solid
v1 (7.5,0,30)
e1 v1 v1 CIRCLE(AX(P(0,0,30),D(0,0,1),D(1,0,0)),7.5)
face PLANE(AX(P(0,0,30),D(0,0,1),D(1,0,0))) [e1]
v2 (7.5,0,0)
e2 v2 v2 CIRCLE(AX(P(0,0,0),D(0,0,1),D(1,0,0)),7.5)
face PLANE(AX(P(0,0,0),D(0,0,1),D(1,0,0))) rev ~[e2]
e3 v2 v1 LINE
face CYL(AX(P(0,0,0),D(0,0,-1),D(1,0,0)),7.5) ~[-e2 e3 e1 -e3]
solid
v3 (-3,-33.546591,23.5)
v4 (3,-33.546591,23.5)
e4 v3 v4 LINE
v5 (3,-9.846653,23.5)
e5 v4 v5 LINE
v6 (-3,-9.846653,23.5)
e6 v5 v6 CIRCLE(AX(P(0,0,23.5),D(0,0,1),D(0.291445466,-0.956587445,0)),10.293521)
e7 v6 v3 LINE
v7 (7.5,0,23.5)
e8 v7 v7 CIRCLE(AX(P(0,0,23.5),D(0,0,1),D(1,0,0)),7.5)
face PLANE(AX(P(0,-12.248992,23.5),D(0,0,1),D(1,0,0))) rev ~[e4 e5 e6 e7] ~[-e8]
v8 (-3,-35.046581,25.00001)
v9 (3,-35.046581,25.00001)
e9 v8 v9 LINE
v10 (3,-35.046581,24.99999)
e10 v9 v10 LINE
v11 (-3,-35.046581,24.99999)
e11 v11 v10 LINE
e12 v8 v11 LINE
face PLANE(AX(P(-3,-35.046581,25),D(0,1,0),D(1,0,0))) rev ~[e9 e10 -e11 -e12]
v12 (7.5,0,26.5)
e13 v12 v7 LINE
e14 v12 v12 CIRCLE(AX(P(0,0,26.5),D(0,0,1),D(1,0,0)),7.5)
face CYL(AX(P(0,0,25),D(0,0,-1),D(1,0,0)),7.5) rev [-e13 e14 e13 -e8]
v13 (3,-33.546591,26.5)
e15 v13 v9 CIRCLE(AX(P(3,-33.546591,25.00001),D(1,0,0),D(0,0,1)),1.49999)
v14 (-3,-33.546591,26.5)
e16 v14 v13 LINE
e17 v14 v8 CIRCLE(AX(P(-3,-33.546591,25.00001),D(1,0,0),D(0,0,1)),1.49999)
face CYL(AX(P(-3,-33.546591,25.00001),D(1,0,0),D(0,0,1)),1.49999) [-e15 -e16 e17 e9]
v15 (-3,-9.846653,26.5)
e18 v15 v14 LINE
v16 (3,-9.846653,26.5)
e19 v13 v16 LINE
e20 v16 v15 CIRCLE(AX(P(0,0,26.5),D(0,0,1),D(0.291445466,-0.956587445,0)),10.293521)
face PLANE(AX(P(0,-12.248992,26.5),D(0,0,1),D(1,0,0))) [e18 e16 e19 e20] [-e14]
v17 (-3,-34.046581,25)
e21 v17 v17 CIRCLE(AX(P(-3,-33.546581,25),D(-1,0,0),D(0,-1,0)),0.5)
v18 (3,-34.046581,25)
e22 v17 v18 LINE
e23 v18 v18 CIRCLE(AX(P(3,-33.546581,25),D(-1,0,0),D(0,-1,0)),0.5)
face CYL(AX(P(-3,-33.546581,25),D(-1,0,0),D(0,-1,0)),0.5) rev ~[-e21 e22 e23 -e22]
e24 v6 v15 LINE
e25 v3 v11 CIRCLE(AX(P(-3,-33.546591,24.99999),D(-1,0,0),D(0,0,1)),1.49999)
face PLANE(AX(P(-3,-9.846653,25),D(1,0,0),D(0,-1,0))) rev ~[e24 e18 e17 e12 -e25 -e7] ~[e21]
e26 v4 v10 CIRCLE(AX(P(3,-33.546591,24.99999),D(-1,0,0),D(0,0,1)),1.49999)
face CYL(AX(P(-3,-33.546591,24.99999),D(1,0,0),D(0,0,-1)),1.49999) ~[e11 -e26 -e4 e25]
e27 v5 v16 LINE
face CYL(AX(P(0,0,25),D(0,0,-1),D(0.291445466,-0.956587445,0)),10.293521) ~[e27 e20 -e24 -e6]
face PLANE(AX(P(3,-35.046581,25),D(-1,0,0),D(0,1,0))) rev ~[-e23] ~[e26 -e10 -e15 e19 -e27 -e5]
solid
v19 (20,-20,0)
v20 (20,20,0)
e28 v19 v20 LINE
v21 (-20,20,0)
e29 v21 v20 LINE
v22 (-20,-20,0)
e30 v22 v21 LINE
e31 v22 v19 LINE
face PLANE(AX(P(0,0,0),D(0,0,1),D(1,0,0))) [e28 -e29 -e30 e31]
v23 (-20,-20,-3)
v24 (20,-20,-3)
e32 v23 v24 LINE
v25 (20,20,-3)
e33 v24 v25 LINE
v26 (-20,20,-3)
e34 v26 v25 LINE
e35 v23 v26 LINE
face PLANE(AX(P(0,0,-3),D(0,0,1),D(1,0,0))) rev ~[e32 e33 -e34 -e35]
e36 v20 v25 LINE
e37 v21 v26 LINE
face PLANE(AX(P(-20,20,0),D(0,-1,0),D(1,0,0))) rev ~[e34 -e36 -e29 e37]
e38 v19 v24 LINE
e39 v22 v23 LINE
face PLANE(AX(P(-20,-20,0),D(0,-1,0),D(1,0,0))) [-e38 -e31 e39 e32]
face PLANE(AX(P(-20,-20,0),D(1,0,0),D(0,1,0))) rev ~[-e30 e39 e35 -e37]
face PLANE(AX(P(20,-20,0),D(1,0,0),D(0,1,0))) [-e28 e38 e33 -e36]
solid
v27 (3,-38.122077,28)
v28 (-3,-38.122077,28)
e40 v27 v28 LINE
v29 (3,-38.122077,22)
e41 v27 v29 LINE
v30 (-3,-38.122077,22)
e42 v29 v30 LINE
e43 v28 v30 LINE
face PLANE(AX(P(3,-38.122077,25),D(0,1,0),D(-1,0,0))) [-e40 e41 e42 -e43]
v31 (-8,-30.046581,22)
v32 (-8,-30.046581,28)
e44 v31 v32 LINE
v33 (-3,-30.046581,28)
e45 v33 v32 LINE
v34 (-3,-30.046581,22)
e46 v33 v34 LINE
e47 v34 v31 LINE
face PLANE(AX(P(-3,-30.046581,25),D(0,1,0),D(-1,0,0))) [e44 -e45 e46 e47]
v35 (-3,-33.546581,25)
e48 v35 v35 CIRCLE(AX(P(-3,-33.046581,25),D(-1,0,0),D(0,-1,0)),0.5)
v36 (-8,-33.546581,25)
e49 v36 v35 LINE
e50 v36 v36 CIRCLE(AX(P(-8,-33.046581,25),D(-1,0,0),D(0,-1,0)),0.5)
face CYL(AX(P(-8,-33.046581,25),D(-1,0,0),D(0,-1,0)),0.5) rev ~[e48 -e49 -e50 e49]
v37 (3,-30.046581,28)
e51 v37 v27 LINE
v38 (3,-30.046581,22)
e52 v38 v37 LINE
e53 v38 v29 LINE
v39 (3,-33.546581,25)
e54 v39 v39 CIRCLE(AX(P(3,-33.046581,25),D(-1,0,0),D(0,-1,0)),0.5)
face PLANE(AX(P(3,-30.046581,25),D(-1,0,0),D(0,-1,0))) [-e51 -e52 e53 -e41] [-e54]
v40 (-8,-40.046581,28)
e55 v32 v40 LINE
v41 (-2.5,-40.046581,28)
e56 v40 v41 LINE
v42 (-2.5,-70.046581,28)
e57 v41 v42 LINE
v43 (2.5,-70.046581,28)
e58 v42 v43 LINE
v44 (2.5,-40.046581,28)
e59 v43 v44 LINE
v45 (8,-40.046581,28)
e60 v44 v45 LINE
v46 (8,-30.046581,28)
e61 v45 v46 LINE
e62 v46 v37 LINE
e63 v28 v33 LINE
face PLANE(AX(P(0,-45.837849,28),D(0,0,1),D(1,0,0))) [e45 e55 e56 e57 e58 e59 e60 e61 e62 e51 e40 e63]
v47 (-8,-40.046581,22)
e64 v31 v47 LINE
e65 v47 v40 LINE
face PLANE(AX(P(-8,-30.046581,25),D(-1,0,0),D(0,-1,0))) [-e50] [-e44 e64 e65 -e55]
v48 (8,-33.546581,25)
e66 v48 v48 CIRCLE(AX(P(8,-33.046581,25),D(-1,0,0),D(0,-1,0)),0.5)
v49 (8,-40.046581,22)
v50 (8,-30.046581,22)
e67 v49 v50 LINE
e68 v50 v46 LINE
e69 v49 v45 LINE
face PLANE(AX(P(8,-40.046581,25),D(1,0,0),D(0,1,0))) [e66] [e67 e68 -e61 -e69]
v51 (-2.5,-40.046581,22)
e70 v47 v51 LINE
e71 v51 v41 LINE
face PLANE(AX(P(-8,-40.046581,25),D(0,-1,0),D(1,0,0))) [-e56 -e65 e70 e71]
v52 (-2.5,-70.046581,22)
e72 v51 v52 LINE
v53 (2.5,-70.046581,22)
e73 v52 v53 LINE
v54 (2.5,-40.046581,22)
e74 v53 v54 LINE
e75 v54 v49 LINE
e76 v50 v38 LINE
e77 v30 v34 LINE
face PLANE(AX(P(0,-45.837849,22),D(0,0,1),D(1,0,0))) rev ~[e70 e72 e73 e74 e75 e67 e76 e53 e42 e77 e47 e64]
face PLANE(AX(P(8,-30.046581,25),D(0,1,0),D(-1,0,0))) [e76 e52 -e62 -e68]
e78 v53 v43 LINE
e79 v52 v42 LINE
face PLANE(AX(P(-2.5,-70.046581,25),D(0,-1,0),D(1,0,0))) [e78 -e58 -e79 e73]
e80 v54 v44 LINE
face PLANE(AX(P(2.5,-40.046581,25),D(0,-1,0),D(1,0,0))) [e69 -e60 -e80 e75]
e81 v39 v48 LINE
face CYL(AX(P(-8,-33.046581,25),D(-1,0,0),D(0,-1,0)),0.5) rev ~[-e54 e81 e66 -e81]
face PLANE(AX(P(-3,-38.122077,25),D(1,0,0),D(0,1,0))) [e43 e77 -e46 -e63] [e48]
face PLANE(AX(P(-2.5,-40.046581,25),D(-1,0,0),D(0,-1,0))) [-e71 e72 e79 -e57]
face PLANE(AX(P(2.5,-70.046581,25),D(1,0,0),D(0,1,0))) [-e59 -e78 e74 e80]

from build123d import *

# Parameters (mm, degrees)
F0_W      = 40
F0_H      = 40
F1_DEPTH  = 3
F2_R      = 7.5
F3_DEPTH  = 30
F5_R      = 7.5
F6_DEPTH  = 1.5
F8_DEPTH  = 3
F9_R      = 1.49999
F10_R     = 0.5
F11_DEPTH = 23.001
F12_R     = 0.5
F13_DEPTH = 28.001


# Not quite as in the source:
# - a fillet or chamfer is up to 0.001 mm smaller than in the source, because OpenCascade refuses the exact size


with BuildPart() as f1:
    # F0 (on Top) → F1 (new body)
    with BuildSketch(Plane.XY):
        Rectangle(F0_W, F0_H)
    extrude(amount=-F1_DEPTH)


with BuildPart() as f3:
    # F2 (on face) → F3 (new body)
    with BuildSketch(Plane.XY):
        Circle(F2_R)
    extrude(amount=F3_DEPTH)


with BuildPart() as f6:
    # F5 (on offset) → F6 (new body, symmetric)
    with BuildSketch(Plane.XY.offset(25)):
        with BuildLine():
            Line((3, -35.0465811789), (3, -9.846652891))
            ThreePointArc((3, -9.846652891), (0, 10.2935209309), (-3, -9.846652891))
            Line((-3, -9.846652891), (-3, -35.0465811789))
            Line((-3, -35.0465811789), (3, -35.0465811789))
        make_face()
        Circle(F5_R, mode=Mode.SUBTRACT)
    extrude(amount=-F6_DEPTH, both=True)

    # F9 (radius 1.5 in the source; OpenCascade refuses exactly that, so slightly less here)
    f9_edges = [f6.edges().sort_by_distance(p)[0] for p in [
        (0, -35.046581, 23.5),
        (0, -35.046581, 26.5),
    ]]
    fillet(f9_edges, radius=F9_R)

    # F10 (on face) → F11 (cut, through all)
    with BuildSketch(Plane(origin=(-3, 0, 0), x_dir=(0, -1, 0), z_dir=(-1, 0, 0))):
        with Locations((33.5465811789, 25)):
            Circle(F10_R)
    extrude(amount=-F11_DEPTH, mode=Mode.SUBTRACT)


with BuildPart() as f8:
    # F7 (on offset) → F8 (new body, symmetric)
    with BuildSketch(Plane.XY.offset(25)):
        Polygon((-3, -35.0465811789), (-3, -30.0465811789), (-8, -30.0465811789), (-8, -40.0465811789), (-2.5, -40.0465811789), (-2.5, -70.0465811789), (2.5, -70.0465811789), (2.5, -40.0465811789), (8, -40.0465811789), (8, -30.0465811789), (3, -30.0465811789), (3, -35.0465811789), (3, -38.1220765412), (-3, -38.1220765412), align=None)
    extrude(amount=F8_DEPTH, both=True)

    # F12 (on face) → F13 (cut, through all)
    with BuildSketch(Plane(origin=(-8, 0, 0), x_dir=(0, -1, 0), z_dir=(-1, 0, 0))):
        with Locations((33.0465811789, 25)):
            Circle(F12_R)
    extrude(amount=-F13_DEPTH, mode=Mode.SUBTRACT)


solid = Compound([f1.part, f3.part, f6.part, f8.part])
